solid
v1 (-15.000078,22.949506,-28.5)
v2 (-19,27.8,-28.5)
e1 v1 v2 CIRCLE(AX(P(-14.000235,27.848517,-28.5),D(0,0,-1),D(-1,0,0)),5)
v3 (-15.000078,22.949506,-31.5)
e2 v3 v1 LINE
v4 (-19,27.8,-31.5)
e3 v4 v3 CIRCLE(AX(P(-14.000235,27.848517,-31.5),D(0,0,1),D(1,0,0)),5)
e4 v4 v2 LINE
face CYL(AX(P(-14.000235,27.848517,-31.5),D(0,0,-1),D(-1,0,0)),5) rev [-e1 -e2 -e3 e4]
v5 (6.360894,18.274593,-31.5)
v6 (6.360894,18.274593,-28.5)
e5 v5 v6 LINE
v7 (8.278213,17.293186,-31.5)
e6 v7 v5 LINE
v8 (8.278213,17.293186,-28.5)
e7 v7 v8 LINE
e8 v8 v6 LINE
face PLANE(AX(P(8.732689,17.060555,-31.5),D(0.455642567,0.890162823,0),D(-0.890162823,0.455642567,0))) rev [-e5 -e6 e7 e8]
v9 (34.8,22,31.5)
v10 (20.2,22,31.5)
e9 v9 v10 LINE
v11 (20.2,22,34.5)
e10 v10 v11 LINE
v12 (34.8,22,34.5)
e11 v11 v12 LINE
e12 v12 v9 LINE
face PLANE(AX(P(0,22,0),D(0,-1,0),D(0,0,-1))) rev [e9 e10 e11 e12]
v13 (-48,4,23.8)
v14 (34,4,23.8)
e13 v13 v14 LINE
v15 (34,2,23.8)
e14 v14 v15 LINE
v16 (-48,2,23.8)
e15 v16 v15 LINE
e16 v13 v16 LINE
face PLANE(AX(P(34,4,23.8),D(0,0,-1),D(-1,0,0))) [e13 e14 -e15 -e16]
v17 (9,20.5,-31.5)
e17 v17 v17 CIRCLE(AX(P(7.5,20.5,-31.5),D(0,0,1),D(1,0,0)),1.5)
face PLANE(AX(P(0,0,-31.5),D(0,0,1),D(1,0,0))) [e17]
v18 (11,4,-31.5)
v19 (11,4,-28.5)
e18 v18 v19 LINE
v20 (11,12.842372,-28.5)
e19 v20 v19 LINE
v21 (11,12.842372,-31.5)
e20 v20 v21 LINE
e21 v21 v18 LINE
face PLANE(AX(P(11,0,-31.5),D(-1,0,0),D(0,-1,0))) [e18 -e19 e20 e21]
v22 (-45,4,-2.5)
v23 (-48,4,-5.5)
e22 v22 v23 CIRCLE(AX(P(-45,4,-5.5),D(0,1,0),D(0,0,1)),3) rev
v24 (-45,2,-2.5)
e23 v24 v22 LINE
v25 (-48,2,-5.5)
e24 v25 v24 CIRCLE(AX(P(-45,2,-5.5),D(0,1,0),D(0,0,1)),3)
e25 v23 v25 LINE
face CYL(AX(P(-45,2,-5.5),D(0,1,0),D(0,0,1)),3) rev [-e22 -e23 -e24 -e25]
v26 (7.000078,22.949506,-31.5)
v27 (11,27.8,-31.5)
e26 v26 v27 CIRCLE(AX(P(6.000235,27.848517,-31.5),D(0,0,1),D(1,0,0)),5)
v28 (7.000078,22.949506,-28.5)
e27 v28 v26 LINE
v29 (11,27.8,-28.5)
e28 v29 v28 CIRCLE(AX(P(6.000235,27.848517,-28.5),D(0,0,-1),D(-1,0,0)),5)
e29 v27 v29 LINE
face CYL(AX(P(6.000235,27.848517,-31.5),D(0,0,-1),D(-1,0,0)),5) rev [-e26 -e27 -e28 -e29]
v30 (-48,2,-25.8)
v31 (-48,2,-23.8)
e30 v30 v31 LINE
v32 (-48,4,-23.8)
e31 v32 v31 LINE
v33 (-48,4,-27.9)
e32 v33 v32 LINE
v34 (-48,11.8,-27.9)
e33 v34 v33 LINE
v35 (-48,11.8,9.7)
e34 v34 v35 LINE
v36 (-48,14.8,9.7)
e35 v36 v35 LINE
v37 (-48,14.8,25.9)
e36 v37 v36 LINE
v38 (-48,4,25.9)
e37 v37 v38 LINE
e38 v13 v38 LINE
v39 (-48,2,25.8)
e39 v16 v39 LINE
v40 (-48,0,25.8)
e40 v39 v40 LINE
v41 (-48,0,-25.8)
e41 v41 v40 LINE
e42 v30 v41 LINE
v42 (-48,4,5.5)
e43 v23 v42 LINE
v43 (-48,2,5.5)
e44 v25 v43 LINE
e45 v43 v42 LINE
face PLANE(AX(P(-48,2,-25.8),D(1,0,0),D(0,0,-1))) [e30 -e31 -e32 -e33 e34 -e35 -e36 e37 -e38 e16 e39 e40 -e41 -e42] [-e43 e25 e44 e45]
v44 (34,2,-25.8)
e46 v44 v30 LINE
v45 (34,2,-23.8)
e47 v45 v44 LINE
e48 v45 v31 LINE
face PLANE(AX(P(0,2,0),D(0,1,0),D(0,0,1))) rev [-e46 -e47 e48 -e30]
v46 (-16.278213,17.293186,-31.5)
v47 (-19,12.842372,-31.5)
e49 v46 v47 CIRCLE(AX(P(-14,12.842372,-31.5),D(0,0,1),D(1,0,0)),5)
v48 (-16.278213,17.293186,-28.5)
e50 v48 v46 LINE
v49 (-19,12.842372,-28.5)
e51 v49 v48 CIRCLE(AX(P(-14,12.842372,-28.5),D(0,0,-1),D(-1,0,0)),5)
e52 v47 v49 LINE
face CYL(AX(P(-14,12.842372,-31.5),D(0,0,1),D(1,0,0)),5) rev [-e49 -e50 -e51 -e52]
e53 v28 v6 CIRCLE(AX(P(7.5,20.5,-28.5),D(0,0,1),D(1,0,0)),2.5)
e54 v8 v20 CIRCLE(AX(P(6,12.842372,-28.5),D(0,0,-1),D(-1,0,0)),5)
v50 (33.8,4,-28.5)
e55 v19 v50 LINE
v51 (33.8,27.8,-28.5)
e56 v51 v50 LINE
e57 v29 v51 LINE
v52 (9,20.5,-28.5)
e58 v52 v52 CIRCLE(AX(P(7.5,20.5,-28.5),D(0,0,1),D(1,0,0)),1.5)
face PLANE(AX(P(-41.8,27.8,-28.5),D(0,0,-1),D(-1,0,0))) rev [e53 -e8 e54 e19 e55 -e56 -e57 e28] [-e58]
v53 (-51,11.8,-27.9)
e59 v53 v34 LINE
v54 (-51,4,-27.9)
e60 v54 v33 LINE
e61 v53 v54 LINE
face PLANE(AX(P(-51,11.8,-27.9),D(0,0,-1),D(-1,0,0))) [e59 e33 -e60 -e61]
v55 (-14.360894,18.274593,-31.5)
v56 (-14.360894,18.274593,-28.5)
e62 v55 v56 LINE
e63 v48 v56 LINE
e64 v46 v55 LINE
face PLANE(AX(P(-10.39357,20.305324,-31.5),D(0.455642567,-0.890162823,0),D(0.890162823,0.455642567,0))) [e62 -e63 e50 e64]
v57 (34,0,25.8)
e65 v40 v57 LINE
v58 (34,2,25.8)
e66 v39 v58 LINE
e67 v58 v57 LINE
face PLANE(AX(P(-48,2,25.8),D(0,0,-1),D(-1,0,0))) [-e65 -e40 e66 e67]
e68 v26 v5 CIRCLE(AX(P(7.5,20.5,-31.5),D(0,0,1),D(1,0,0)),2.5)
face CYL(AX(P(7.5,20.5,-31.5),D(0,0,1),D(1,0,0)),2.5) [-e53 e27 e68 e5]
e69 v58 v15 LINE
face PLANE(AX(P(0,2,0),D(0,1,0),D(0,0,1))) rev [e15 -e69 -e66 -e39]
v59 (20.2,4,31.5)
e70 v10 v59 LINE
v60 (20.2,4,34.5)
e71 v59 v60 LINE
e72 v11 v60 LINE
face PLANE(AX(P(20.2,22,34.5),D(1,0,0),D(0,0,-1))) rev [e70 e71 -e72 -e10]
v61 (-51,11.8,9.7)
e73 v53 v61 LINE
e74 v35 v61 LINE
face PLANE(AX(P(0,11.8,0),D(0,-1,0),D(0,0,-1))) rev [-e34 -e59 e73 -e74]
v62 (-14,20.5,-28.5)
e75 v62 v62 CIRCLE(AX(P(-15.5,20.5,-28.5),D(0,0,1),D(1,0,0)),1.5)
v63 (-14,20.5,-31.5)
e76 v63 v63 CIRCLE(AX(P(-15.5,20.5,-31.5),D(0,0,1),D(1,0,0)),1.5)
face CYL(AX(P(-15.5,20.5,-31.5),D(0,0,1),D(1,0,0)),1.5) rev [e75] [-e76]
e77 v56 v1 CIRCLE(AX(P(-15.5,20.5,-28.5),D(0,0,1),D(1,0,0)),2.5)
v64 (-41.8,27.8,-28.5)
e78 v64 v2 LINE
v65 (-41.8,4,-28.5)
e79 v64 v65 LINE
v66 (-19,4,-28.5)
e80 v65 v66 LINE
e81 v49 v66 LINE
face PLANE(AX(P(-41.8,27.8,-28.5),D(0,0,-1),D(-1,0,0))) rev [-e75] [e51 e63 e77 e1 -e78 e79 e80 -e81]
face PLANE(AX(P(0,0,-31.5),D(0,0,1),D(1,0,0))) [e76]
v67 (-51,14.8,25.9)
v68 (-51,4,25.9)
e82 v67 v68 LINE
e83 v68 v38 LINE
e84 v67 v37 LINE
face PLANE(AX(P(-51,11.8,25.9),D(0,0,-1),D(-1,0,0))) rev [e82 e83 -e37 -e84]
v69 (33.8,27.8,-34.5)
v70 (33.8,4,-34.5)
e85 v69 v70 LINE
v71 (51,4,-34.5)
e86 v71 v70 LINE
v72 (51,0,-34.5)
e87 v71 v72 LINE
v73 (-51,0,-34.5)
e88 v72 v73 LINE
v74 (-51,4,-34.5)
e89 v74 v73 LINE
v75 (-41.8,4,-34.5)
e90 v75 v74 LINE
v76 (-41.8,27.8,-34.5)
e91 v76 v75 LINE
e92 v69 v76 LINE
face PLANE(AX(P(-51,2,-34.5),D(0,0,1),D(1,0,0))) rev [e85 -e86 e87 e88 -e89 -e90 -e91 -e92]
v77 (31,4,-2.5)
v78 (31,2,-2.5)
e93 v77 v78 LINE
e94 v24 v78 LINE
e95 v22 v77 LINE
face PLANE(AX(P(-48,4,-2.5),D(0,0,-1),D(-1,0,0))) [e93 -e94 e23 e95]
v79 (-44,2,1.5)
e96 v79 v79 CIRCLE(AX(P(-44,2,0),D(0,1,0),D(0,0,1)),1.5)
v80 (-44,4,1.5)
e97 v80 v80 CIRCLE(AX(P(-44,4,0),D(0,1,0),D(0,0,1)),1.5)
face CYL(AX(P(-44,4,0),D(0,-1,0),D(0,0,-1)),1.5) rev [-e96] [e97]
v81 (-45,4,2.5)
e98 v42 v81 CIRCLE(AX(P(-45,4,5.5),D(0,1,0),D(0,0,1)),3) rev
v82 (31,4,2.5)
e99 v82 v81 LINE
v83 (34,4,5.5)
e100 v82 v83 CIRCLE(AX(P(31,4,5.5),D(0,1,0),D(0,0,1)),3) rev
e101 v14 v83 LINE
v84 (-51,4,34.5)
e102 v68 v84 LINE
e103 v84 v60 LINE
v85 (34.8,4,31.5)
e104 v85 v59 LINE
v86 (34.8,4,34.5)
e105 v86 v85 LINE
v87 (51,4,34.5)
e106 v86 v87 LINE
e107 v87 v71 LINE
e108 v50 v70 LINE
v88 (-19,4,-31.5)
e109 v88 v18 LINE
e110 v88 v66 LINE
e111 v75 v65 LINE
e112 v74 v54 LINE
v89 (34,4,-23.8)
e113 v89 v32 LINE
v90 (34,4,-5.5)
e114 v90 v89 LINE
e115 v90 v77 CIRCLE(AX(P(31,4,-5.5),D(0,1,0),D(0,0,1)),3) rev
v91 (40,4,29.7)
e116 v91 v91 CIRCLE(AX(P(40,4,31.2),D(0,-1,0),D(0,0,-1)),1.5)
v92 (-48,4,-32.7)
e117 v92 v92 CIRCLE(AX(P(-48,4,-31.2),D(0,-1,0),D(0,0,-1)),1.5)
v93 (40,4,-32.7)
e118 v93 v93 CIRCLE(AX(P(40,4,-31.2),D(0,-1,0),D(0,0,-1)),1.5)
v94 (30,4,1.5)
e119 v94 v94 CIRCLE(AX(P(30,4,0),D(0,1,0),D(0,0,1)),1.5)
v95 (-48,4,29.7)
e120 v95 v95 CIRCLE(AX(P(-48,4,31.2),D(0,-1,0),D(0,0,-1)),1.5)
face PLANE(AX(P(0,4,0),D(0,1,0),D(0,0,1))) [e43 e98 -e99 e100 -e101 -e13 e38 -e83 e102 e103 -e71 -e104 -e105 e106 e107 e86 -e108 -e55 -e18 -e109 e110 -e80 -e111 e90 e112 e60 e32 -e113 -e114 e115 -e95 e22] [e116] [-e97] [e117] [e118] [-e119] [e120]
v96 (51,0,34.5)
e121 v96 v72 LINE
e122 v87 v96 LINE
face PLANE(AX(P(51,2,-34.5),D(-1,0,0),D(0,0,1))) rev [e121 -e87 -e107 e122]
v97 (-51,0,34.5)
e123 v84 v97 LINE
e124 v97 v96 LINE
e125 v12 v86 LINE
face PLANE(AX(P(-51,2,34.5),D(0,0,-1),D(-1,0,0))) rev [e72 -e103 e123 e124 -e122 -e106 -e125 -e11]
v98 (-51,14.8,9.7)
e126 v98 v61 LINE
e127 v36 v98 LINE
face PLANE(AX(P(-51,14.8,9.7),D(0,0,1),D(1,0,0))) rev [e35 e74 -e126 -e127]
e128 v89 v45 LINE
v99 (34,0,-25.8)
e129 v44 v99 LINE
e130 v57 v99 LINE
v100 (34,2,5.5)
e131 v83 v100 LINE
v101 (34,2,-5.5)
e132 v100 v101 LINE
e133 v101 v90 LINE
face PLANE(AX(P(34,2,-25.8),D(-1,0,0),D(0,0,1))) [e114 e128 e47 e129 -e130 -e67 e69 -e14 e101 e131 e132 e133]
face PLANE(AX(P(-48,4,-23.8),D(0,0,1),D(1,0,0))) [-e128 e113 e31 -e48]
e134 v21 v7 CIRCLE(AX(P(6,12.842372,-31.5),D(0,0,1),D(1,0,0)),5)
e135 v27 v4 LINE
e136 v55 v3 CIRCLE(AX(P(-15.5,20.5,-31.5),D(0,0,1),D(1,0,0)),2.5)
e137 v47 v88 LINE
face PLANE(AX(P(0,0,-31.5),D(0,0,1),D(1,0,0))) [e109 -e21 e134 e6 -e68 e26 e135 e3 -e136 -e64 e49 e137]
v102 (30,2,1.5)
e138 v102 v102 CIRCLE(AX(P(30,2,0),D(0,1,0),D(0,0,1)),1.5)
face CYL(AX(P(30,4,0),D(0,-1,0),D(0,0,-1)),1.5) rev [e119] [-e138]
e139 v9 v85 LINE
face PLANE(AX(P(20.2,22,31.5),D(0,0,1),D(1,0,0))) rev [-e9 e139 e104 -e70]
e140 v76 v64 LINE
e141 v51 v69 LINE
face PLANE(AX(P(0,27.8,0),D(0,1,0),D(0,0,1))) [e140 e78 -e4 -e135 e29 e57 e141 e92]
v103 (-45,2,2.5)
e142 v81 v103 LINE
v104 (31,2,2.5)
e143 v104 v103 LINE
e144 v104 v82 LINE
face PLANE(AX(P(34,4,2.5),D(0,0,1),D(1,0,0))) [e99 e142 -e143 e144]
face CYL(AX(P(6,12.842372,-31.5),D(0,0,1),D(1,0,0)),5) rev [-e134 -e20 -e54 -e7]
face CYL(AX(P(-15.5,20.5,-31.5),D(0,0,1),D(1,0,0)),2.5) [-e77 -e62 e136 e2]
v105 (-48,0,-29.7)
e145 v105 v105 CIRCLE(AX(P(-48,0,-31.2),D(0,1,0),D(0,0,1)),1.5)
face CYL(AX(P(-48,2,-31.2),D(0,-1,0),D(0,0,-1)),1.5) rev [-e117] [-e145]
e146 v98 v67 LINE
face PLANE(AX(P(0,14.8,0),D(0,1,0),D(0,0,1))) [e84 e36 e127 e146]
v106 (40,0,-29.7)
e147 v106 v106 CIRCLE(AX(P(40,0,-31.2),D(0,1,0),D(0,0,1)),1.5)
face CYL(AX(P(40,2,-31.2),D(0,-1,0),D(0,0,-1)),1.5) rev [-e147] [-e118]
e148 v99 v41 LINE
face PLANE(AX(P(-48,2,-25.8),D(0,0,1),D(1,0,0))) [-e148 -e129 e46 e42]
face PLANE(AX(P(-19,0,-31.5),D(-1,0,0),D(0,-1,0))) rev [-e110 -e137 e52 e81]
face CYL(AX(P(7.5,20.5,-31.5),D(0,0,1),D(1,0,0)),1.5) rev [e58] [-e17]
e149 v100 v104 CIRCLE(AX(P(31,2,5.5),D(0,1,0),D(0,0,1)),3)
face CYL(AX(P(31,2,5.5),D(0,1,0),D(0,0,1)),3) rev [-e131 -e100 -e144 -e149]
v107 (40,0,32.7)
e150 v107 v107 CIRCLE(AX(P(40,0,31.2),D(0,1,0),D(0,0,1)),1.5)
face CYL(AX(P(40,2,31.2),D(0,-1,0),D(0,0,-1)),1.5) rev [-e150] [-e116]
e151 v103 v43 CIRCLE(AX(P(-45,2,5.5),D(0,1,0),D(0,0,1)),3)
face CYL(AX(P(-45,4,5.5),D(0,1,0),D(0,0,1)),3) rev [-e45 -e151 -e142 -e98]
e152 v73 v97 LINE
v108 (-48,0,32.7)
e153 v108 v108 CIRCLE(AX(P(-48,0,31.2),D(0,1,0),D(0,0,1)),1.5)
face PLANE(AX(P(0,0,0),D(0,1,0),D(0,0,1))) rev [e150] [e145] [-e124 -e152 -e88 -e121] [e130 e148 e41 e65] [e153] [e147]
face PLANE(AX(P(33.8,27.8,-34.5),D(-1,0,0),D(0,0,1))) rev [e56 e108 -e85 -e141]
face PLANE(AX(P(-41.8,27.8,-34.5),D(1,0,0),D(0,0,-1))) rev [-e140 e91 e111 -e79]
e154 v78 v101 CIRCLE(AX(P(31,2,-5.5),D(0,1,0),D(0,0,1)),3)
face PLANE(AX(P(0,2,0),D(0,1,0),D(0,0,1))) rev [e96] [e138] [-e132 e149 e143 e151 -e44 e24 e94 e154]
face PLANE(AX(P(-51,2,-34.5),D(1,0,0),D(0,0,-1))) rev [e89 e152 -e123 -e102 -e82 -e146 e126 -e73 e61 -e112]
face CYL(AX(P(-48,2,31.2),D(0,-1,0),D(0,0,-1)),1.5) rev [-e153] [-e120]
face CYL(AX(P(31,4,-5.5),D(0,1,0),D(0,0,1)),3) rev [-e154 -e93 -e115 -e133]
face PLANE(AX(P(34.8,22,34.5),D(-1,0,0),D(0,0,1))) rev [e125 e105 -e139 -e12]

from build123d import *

# Parameters (mm, degrees)
SKETCH1_W           = 102
SKETCH1_H           = 69
SKETCH1_R           = 1.5
SKETCH1_W_2         = 82
SKETCH1_H_2         = 51.6
BOSS_EXTRUDE1_DEPTH = 2
SKETCH2_W           = 102
SKETCH2_H           = 69
SKETCH2_R           = 1.5
SKETCH2_W_2         = 82
SKETCH2_H_2         = 21.3
BOSS_EXTRUDE2_DEPTH = 2
FILLET1_R           = 3
SKETCH3_R           = 1.5
CUT_EXTRUDE1_DEPTH  = 62.605600395
SKETCH9_W           = 75.6
SKETCH9_H           = 6
BOSS_EXTRUDE5_DEPTH = 23.8
SKETCH10_R          = 1.5
CUT_EXTRUDE6_DEPTH  = 3
FILLET3_R           = 5
SKETCH11_W          = 14.6
SKETCH11_H          = 3
BOSS_EXTRUDE6_DEPTH = 18
SKETCH12_W          = 3
SKETCH12_H          = 53.8
BOSS_EXTRUDE7_DEPTH = 7.8
SKETCH13_W          = 3
SKETCH13_H          = 16.2
BOSS_EXTRUDE8_DEPTH = 3


with BuildPart() as part:
    # Sketch1 → Boss-Extrude1 (new body)
    with BuildSketch(Plane(origin=(0, 0, 0), x_dir=(1, 0, 0), z_dir=(0, 1, 0))):
        Rectangle(SKETCH1_W, SKETCH1_H)
        with Locations(Location((-48, 31.2, 0), (0, 0, 270))):
            Circle(SKETCH1_R, mode=Mode.SUBTRACT)
        with Locations(Location((40, 31.2, 0), (0, 0, 270))):
            Circle(SKETCH1_R, mode=Mode.SUBTRACT)
        with Locations(Location((40, -31.2, 0), (0, 0, 270))):
            Circle(SKETCH1_R, mode=Mode.SUBTRACT)
        with Locations(Location((-48, -31.2, 0), (0, 0, 270))):
            Circle(SKETCH1_R, mode=Mode.SUBTRACT)
        with Locations((-7, 0)):
            Rectangle(SKETCH1_W_2, SKETCH1_H_2, mode=Mode.SUBTRACT)
    extrude(amount=BOSS_EXTRUDE1_DEPTH)

    # Sketch2 → Boss-Extrude2 (add)
    with BuildSketch(Plane(origin=(0, 2, 0), x_dir=(1, 0, 0), z_dir=(0, 1, 0))):
        Rectangle(SKETCH2_W, SKETCH2_H)
        with Locations(Location((-44, 0, 0), (0, 0, 270))):
            Circle(SKETCH2_R, mode=Mode.SUBTRACT)
        with Locations(Location((30, 0, 0), (0, 0, 270))):
            Circle(SKETCH2_R, mode=Mode.SUBTRACT)
        with Locations((-7, 13.15)):
            Rectangle(SKETCH2_W_2, SKETCH2_H_2, mode=Mode.SUBTRACT)
        with Locations((-7, -13.15)):
            Rectangle(SKETCH2_W_2, SKETCH2_H_2, mode=Mode.SUBTRACT)
    extrude(amount=BOSS_EXTRUDE2_DEPTH)

    # Fillet1
    fillet1_edges = [part.edges().sort_by_distance(p)[0] for p in [
        (-48, 3, -2.5),
        (34, 3, -2.5),
        (34, 3, 2.5),
        (-48, 3, 2.5),
    ]]
    fillet(fillet1_edges, radius=FILLET1_R)

    # Sketch3 → Cut-Extrude1 (cut, through all)
    with BuildSketch(Plane.XZ.offset(-2)):
        with Locations(Location((-48, 31.2, 0), (0, 0, 270))):
            Circle(SKETCH3_R)
        with Locations(Location((-48, -31.2, 0), (0, 0, 270))):
            Circle(SKETCH3_R)
        with Locations(Location((40, -31.2, 0), (0, 0, 270))):
            Circle(SKETCH3_R)
        with Locations(Location((40, 31.2, 0), (0, 0, 270))):
            Circle(SKETCH3_R)
    extrude(amount=-CUT_EXTRUDE1_DEPTH, mode=Mode.SUBTRACT)

    # Sketch9 → Boss-Extrude5 (add)
    with BuildSketch(Plane(origin=(0, 4, 0), x_dir=(1, 0, 0), z_dir=(0, 1, 0))):
        with Locations((-4, 31.5)):
            Rectangle(SKETCH9_W, SKETCH9_H)
    extrude(amount=BOSS_EXTRUDE5_DEPTH)

    # Sketch10 → Cut-Extrude6 (cut)
    with BuildSketch(Plane.XY.offset(-28.5)):
        with BuildLine():
            Line((11, 27.8), (-19, 27.8))
            Line((-19, 27.8), (-19, 23))
            Line((-19, 23), (-15.5, 23))
            ThreePointArc((-15.5, 23), (-13.069617557, 21.085867885), (-14.360893582, 18.274592943))
            Line((-14.360893582, 18.274592943), (-19, 15.9))
            Line((-19, 15.9), (-19, 4))
            Line((-19, 4), (11, 4))
            Line((11, 4), (11, 15.9))
            Line((11, 15.9), (6.360893582, 18.274592943))
            ThreePointArc((6.360893582, 18.274592943), (5.069617557, 21.085867885), (7.5, 23))
            Line((7.5, 23), (11, 23))
            Line((11, 23), (11, 27.8))
        make_face()
        with Locations((-15.5, 20.5)):
            Circle(SKETCH10_R)
        with Locations((7.5, 20.5)):
            Circle(SKETCH10_R)
    extrude(amount=-CUT_EXTRUDE6_DEPTH, mode=Mode.SUBTRACT)

    # Fillet3
    # the kernel refuses this fillet: 5 mm, written as the material it adds along each edge
    with BuildSketch(Plane(origin=(-19, 15.9, -28.5), x_dir=(0, -1, 0), z_dir=(0, 0, -1))) as fillet3_piece_1:
        with BuildLine():
            CenterArc((FILLET3_R * 0.611525688318, -FILLET3_R), FILLET3_R, 90, 62.893714251)
            Line((-FILLET3_R * 0.278637134463, -FILLET3_R * 0.544357432916), (0, 0))
            Line((0, 0), (FILLET3_R * 0.611525688318, 0))
        make_face()
    extrude(amount=3)
    with BuildSketch(Plane(origin=(11, 15.9, -28.5), x_dir=(0, -1, 0), z_dir=(0, 0, -1))) as fillet3_piece_2:
        with BuildLine():
            CenterArc((FILLET3_R * 0.611525688318, FILLET3_R), FILLET3_R, 207.106285749, 62.893714251)
            Line((-FILLET3_R * 0.278637134463, FILLET3_R * 0.544357432916), (0, 0))
            Line((0, 0), (FILLET3_R * 0.611525688318, 0))
        make_face()
    extrude(amount=3)
    with BuildSketch(Plane(origin=(11, 23, -28.5), x_dir=(-0.9999202818433616, -0.012626557658055267, 0), z_dir=(0, 0, -1))) as fillet3_piece_3_section:
        with BuildLine():
            CenterArc((4.938381933, 4.911215506), FILLET3_R, 180.723467688, 78.463040967)
            Line((-0.061219476, 4.848082717), (-0.561179617, 4.841769438))
            Line((-0.561179617, 4.841769438), (-0.499960141, -0.006313279))
            Line((-0.499960141, -0.006313279), (0.006313279, -0.499960141))
            ThreePointArc((0.006313279, -0.499960141), (3.506034265, -0.455767189), (3.906512595, -0.491121551))
            Line((3.906512595, -0.491121551), (4.000318898, 0))
        make_face()
    fillet3_piece_3 = extrude(amount=3, mode=Mode.PRIVATE)
    fillet3_piece_3 = split(fillet3_piece_3, bisect_by=Plane(origin=(10.155931767, 27.8, -30), z_dir=(0, -1, 0)), keep=Keep.TOP, mode=Mode.PRIVATE)
    add(fillet3_piece_3)
    with BuildSketch(Plane(origin=(-19, 23, -28.5), x_dir=(0, 1, 0), z_dir=(0, 0, -1))) as fillet3_piece_4_section:
        with BuildLine():
            CenterArc((4.848469228, 5), FILLET3_R, 191.536959033, 78.463040967)
            Line((-0.050510257, 4), (-0.540408206, 3.9))
            ThreePointArc((-0.540408206, 3.9), (-0.5, 3.5), (-0.5, 0))
            Line((-0.5, 0), (0, -0.5))
            Line((0, -0.5), (4.848469228, -0.5))
            Line((4.848469228, -0.5), (4.848469228, 0))
        make_face()
    fillet3_piece_4 = extrude(amount=3, mode=Mode.PRIVATE)
    fillet3_piece_4 = split(fillet3_piece_4, bisect_by=Plane(origin=(-18.155931767, 27.8, -30), z_dir=(0, -1, 0)), keep=Keep.TOP, mode=Mode.PRIVATE)
    add(fillet3_piece_4)

    # Sketch11 → Boss-Extrude6 (add)
    with BuildSketch(Plane(origin=(0, 4, 0), x_dir=(1, 0, 0), z_dir=(0, 1, 0))):
        with Locations((27.5, -33)):
            Rectangle(SKETCH11_W, SKETCH11_H)
    extrude(amount=BOSS_EXTRUDE6_DEPTH)

    # Sketch12 → Boss-Extrude7 (add)
    with BuildSketch(Plane(origin=(0, 4, 0), x_dir=(1, 0, 0), z_dir=(0, 1, 0))):
        with Locations((-49.5, 1)):
            Rectangle(SKETCH12_W, SKETCH12_H)
    extrude(amount=BOSS_EXTRUDE7_DEPTH)

    # Sketch13 → Boss-Extrude8 (add)
    with BuildSketch(Plane(origin=(0, 11.8, 0), x_dir=(1, 0, 0), z_dir=(0, 1, 0))):
        with Locations((-49.5, -17.8)):
            Rectangle(SKETCH13_W, SKETCH13_H)
    extrude(amount=BOSS_EXTRUDE8_DEPTH)


solid = part.part
